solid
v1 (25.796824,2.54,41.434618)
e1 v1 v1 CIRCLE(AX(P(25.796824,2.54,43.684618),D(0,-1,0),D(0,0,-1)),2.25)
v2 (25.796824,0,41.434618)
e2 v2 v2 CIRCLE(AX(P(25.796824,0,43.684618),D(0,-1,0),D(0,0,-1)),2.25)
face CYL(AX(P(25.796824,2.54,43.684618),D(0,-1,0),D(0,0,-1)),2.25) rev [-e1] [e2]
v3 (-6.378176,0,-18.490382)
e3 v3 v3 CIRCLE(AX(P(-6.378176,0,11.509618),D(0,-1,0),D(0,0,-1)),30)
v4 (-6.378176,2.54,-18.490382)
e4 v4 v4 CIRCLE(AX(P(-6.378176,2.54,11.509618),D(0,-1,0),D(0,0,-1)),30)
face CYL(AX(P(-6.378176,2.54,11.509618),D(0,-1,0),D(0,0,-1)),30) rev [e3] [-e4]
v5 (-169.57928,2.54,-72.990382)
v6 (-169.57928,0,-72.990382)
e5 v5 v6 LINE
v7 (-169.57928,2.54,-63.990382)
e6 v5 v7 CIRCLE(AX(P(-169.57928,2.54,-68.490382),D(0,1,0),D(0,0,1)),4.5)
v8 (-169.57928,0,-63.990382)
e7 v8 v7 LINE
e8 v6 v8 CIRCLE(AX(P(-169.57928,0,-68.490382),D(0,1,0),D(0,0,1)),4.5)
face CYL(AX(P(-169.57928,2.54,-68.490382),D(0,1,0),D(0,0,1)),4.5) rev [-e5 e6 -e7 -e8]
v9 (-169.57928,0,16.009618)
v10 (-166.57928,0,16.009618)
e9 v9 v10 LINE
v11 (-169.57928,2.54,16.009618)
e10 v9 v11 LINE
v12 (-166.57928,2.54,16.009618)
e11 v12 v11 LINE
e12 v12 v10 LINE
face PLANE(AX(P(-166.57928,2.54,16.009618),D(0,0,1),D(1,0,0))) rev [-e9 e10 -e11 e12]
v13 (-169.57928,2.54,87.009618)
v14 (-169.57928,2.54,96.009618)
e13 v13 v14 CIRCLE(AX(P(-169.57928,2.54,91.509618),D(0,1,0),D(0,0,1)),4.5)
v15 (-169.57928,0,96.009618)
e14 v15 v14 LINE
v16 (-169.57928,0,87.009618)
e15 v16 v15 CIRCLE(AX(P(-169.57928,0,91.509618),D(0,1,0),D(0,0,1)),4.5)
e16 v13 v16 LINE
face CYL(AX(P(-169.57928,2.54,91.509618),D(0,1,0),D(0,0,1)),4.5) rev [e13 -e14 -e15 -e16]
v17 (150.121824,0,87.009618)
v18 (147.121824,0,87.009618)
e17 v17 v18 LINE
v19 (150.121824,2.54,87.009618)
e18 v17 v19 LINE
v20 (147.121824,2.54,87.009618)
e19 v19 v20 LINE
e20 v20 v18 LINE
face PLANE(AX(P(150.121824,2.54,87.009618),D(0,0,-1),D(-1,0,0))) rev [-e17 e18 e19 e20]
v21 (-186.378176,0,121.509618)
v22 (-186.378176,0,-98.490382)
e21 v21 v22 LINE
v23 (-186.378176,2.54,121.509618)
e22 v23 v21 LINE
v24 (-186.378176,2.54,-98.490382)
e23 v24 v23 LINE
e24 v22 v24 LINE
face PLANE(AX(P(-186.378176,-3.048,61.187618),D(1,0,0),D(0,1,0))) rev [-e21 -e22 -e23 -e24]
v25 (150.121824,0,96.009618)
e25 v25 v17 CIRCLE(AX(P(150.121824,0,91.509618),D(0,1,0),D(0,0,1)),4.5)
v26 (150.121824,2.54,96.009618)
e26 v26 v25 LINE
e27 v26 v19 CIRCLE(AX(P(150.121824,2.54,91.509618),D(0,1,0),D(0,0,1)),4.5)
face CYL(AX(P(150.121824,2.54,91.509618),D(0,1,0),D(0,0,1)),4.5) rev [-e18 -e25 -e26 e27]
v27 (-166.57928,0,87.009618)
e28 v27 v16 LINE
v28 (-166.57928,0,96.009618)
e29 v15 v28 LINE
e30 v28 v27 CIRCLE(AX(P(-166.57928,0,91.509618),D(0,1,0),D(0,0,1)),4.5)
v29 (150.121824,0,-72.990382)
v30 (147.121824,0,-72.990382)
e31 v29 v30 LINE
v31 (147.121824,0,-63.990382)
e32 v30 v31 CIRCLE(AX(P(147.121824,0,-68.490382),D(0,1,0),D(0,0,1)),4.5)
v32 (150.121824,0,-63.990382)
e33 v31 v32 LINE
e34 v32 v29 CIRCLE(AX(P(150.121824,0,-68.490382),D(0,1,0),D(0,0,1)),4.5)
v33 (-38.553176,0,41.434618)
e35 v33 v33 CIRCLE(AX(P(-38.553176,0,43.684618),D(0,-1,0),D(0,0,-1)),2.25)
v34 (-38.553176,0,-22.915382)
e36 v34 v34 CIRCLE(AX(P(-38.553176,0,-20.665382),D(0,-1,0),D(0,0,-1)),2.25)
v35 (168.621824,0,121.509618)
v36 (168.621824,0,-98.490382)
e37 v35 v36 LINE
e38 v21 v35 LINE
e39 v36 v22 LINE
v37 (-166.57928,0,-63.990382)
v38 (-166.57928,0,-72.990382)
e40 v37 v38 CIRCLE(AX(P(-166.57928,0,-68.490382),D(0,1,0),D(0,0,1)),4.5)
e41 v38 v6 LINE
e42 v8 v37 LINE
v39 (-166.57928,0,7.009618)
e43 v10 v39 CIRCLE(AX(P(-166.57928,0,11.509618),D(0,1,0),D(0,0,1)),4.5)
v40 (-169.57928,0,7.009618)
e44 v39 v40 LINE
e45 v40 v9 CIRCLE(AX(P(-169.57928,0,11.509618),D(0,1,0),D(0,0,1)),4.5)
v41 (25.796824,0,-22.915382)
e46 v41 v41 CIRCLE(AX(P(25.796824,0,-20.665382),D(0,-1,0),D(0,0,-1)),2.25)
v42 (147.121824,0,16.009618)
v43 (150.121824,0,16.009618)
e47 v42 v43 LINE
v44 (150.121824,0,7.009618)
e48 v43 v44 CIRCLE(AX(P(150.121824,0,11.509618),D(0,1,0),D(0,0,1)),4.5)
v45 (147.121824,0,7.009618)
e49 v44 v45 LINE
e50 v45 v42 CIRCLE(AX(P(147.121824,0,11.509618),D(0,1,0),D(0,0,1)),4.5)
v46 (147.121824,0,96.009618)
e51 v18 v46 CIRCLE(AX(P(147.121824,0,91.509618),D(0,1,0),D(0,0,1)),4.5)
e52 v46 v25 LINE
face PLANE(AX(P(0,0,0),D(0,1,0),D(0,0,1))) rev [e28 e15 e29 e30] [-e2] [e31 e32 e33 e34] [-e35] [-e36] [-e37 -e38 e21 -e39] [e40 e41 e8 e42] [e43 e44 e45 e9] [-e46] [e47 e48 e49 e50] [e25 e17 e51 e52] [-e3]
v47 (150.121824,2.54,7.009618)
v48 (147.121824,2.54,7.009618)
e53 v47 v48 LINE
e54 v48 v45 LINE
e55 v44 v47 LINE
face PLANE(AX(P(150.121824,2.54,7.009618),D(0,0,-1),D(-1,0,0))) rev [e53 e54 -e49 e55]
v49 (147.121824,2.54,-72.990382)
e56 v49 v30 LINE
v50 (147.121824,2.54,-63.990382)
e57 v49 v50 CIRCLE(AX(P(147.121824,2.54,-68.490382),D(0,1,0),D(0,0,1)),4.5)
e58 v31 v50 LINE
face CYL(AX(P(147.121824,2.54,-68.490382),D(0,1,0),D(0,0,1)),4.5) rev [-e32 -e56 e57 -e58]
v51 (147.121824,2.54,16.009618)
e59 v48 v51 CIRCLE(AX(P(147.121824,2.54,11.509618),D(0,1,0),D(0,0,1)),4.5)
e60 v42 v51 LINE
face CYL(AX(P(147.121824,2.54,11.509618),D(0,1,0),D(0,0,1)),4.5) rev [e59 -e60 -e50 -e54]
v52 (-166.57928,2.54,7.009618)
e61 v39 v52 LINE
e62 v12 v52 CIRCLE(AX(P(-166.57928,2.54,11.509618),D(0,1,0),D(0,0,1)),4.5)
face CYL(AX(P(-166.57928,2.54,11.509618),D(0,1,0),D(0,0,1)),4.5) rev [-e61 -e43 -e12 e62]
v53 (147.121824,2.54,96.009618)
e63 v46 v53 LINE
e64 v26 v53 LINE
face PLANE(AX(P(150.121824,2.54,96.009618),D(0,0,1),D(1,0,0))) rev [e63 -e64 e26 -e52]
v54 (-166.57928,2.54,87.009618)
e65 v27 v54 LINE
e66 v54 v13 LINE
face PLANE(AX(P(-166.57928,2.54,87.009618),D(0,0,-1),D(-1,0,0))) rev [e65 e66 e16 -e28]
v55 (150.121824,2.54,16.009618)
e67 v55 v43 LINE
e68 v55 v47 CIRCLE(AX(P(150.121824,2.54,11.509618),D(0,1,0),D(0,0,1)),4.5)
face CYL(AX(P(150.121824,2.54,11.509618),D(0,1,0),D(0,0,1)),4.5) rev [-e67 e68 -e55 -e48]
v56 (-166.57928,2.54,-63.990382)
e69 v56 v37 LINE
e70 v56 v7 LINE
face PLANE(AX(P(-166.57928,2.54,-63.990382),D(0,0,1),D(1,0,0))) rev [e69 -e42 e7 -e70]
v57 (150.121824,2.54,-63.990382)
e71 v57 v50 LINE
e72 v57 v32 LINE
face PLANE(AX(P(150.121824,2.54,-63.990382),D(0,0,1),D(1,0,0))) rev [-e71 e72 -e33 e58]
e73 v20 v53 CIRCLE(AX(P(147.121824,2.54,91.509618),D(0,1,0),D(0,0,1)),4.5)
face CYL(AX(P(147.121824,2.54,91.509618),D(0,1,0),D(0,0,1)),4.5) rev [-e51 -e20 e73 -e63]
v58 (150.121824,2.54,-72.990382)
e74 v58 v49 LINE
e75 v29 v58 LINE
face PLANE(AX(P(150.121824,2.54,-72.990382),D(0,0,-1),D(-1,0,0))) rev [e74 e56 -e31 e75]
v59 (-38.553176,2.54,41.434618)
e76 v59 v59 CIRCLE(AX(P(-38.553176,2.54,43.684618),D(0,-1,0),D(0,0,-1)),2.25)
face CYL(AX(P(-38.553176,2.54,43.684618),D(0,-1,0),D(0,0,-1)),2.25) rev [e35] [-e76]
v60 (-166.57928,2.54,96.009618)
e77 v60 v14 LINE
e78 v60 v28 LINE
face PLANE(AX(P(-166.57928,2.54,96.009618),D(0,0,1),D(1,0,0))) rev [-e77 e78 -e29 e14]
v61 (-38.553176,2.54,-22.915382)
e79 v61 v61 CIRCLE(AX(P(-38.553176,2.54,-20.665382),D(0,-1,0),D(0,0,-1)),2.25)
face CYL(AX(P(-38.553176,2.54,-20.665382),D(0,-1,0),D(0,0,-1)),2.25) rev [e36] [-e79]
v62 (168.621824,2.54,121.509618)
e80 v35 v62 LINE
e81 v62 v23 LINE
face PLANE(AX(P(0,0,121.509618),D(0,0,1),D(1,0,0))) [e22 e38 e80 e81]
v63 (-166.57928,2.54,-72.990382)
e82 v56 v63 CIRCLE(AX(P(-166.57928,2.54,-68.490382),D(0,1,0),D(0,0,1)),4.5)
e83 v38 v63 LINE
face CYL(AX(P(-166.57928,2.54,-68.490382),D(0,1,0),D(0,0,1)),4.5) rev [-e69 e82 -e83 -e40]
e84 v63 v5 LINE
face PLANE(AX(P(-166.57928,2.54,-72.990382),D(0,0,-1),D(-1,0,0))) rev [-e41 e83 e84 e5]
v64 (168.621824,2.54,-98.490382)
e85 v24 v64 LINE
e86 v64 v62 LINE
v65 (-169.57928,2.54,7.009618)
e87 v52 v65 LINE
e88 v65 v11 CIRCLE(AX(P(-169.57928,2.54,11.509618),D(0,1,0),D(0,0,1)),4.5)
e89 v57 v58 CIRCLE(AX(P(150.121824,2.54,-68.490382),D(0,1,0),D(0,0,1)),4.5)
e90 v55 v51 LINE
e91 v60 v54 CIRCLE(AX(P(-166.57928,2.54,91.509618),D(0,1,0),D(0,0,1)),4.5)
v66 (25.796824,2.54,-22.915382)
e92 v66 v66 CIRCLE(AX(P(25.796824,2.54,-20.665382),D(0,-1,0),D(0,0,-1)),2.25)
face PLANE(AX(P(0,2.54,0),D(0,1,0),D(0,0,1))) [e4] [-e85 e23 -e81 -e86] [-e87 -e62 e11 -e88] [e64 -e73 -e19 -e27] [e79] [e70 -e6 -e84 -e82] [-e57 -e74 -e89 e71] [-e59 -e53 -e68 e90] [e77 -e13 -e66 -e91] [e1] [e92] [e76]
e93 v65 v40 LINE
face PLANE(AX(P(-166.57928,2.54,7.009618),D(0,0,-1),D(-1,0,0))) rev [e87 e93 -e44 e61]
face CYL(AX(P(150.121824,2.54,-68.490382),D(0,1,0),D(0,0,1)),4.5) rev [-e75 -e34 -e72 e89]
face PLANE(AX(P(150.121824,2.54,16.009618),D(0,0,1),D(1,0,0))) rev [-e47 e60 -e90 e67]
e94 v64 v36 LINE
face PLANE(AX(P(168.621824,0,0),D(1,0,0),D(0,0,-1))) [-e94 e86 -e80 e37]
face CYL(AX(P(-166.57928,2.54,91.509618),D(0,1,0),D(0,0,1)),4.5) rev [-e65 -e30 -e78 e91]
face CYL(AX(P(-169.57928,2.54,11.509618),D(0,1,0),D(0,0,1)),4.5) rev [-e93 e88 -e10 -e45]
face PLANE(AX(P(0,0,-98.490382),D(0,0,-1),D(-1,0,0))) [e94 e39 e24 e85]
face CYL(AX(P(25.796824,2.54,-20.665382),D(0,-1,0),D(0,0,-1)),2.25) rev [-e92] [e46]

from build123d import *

# Parameters (mm, degrees)
SKETCH1_W                = 355
SKETCH1_H                = 100
BOSS_EXTRUDE1_DEPTH      = 2.54
SKETCH4_R                = 2.25
SKETCH4_R_2              = 30
CUT_EXTRUDE1_DEPTH       = 2.54
SKETCH5_W                = 100
SKETCH5_H                = 2.54
BOSS_EXTRUDE2_DEPTH      = 2.5
SKETCH6_W                = 100
SKETCH6_H                = 2.54
CUT_EXTRUDE2_DEPTH       = 2.5
SKETCH7_W                = 355
SKETCH7_H                = 2.54
BOSS_EXTRUDE3_DEPTH      = 60
SKETCH8_W                = 355
SKETCH8_H                = 2.54
BOSS_EXTRUDE4_DEPTH      = 60
M8_CLEARANCE_SLOT6_DEPTH = 2.54


# Read off the part's stored shape, not the designer's step: M8 Clearance Slot6
with BuildPart() as part:
    # Sketch1 → Boss-Extrude1 (new body)
    with BuildSketch(Plane(origin=(0, 0, 0), x_dir=(1, 0, 0), z_dir=(0, 1, 0))):
        with Locations((-6.378176495, -11.509617782)):
            Rectangle(SKETCH1_W, SKETCH1_H)
    extrude(amount=BOSS_EXTRUDE1_DEPTH)

    # Sketch4 → Cut-Extrude1 (cut)
    with BuildSketch(Plane(origin=(0, 0, 0), x_dir=(-1, 0, 0), z_dir=(0, -1, 0))):
        with Locations(Location((38.553176495, 20.665382218, 0), (0, 0, 90))):
            Circle(SKETCH4_R)
        with Locations(Location((-25.796823505, 20.665382218, 0), (0, 0, 90))):
            Circle(SKETCH4_R)
        with Locations(Location((-25.796823505, -43.684617782, 0), (0, 0, 90))):
            Circle(SKETCH4_R)
        with Locations(Location((38.553176495, -43.684617782, 0), (0, 0, 90))):
            Circle(SKETCH4_R)
        with Locations(Location((6.378176495, -11.509617782, 0), (0, 0, 90))):
            Circle(SKETCH4_R_2)
    extrude(amount=-CUT_EXTRUDE1_DEPTH, mode=Mode.SUBTRACT)

    # Sketch5 → Boss-Extrude2 (add)
    with BuildSketch(Plane.ZY.offset(183.878176495)):
        with Locations((11.509617782, 1.27)):
            Rectangle(SKETCH5_W, SKETCH5_H)
    extrude(amount=BOSS_EXTRUDE2_DEPTH)

    # Sketch6 → Cut-Extrude2 (cut)
    with BuildSketch(Plane(origin=(171.121823505, 0, 0), x_dir=(0, 0, -1), z_dir=(1, 0, 0))):
        with Locations((-11.509617782, 1.27)):
            Rectangle(SKETCH6_W, SKETCH6_H)
    extrude(amount=-CUT_EXTRUDE2_DEPTH, mode=Mode.SUBTRACT)

    # Sketch7 → Boss-Extrude3 (add)
    with BuildSketch(Plane(origin=(0, 0, -38.490382218), x_dir=(-1, 0, 0), z_dir=(0, 0, -1))):
        with Locations((8.878176495, 1.27)):
            Rectangle(SKETCH7_W, SKETCH7_H)
    extrude(amount=BOSS_EXTRUDE3_DEPTH)

    # Sketch8 → Boss-Extrude4 (add)
    with BuildSketch(Plane.XY.offset(61.509617782)):
        with Locations((-8.878176495, 1.27)):
            Rectangle(SKETCH8_W, SKETCH8_H)
    extrude(amount=BOSS_EXTRUDE4_DEPTH)

    # M8 Clearance Slot6 outline → M8 Clearance Slot6 (cut)
    with BuildSketch(Plane(origin=(0, 0, 0), x_dir=(1, 0, 0), z_dir=(0, 1, 0))):
        with BuildLine():
            Line((-169.579279891, 63.990382218), (-166.579279891, 63.990382218))
            ThreePointArc((-166.579279891, 63.990382218), (-162.079279891, 68.490382218), (-166.579279891, 72.990382218))
            Line((-166.579279891, 72.990382218), (-169.579279891, 72.990382218))
            ThreePointArc((-169.579279891, 72.990382218), (-174.079279891, 68.490382218), (-169.579279891, 63.990382218))
        make_face()
        with BuildLine():
            ThreePointArc((147.121823505, 72.990382218), (142.621823505, 68.490382218), (147.121823505, 63.990382218))
            Line((147.121823505, 63.990382218), (150.121823505, 63.990382218))
            ThreePointArc((150.121823505, 63.990382218), (154.621823505, 68.490382218), (150.121823505, 72.990382218))
            Line((150.121823505, 72.990382218), (147.121823505, 72.990382218))
        make_face()
        with BuildLine():
            Line((-169.579279891, -96.009617782), (-166.579279891, -96.009617782))
            ThreePointArc((-166.579279891, -96.009617782), (-162.079279891, -91.509617782), (-166.579279891, -87.009617782))
            Line((-166.579279891, -87.009617782), (-169.579279891, -87.009617782))
            ThreePointArc((-169.579279891, -87.009617782), (-174.079279891, -91.509617782), (-169.579279891, -96.009617782))
        make_face()
        with BuildLine():
            ThreePointArc((150.121823505, -96.009617782), (154.621823505, -91.509617782), (150.121823505, -87.009617782))
            Line((150.121823505, -87.009617782), (147.121823505, -87.009617782))
            ThreePointArc((147.121823505, -87.009617782), (142.621823505, -91.509617782), (147.121823505, -96.009617782))
            Line((147.121823505, -96.009617782), (150.121823505, -96.009617782))
        make_face()
        with BuildLine():
            ThreePointArc((-166.579279891, -16.009617782), (-162.079279891, -11.509617782), (-166.579279891, -7.009617782))
            Line((-166.579279891, -7.009617782), (-169.579279891, -7.009617782))
            ThreePointArc((-169.579279891, -7.009617782), (-174.079279891, -11.509617782), (-169.579279891, -16.009617782))
            Line((-169.579279891, -16.009617782), (-166.579279891, -16.009617782))
        make_face()
        with BuildLine():
            ThreePointArc((150.121823505, -16.009617782), (154.621823505, -11.509617782), (150.121823505, -7.009617782))
            Line((150.121823505, -7.009617782), (147.121823505, -7.009617782))
            ThreePointArc((147.121823505, -7.009617782), (142.621823505, -11.509617782), (147.121823505, -16.009617782))
            Line((147.121823505, -16.009617782), (150.121823505, -16.009617782))
        make_face()
    extrude(amount=M8_CLEARANCE_SLOT6_DEPTH, mode=Mode.SUBTRACT)


solid = part.part
